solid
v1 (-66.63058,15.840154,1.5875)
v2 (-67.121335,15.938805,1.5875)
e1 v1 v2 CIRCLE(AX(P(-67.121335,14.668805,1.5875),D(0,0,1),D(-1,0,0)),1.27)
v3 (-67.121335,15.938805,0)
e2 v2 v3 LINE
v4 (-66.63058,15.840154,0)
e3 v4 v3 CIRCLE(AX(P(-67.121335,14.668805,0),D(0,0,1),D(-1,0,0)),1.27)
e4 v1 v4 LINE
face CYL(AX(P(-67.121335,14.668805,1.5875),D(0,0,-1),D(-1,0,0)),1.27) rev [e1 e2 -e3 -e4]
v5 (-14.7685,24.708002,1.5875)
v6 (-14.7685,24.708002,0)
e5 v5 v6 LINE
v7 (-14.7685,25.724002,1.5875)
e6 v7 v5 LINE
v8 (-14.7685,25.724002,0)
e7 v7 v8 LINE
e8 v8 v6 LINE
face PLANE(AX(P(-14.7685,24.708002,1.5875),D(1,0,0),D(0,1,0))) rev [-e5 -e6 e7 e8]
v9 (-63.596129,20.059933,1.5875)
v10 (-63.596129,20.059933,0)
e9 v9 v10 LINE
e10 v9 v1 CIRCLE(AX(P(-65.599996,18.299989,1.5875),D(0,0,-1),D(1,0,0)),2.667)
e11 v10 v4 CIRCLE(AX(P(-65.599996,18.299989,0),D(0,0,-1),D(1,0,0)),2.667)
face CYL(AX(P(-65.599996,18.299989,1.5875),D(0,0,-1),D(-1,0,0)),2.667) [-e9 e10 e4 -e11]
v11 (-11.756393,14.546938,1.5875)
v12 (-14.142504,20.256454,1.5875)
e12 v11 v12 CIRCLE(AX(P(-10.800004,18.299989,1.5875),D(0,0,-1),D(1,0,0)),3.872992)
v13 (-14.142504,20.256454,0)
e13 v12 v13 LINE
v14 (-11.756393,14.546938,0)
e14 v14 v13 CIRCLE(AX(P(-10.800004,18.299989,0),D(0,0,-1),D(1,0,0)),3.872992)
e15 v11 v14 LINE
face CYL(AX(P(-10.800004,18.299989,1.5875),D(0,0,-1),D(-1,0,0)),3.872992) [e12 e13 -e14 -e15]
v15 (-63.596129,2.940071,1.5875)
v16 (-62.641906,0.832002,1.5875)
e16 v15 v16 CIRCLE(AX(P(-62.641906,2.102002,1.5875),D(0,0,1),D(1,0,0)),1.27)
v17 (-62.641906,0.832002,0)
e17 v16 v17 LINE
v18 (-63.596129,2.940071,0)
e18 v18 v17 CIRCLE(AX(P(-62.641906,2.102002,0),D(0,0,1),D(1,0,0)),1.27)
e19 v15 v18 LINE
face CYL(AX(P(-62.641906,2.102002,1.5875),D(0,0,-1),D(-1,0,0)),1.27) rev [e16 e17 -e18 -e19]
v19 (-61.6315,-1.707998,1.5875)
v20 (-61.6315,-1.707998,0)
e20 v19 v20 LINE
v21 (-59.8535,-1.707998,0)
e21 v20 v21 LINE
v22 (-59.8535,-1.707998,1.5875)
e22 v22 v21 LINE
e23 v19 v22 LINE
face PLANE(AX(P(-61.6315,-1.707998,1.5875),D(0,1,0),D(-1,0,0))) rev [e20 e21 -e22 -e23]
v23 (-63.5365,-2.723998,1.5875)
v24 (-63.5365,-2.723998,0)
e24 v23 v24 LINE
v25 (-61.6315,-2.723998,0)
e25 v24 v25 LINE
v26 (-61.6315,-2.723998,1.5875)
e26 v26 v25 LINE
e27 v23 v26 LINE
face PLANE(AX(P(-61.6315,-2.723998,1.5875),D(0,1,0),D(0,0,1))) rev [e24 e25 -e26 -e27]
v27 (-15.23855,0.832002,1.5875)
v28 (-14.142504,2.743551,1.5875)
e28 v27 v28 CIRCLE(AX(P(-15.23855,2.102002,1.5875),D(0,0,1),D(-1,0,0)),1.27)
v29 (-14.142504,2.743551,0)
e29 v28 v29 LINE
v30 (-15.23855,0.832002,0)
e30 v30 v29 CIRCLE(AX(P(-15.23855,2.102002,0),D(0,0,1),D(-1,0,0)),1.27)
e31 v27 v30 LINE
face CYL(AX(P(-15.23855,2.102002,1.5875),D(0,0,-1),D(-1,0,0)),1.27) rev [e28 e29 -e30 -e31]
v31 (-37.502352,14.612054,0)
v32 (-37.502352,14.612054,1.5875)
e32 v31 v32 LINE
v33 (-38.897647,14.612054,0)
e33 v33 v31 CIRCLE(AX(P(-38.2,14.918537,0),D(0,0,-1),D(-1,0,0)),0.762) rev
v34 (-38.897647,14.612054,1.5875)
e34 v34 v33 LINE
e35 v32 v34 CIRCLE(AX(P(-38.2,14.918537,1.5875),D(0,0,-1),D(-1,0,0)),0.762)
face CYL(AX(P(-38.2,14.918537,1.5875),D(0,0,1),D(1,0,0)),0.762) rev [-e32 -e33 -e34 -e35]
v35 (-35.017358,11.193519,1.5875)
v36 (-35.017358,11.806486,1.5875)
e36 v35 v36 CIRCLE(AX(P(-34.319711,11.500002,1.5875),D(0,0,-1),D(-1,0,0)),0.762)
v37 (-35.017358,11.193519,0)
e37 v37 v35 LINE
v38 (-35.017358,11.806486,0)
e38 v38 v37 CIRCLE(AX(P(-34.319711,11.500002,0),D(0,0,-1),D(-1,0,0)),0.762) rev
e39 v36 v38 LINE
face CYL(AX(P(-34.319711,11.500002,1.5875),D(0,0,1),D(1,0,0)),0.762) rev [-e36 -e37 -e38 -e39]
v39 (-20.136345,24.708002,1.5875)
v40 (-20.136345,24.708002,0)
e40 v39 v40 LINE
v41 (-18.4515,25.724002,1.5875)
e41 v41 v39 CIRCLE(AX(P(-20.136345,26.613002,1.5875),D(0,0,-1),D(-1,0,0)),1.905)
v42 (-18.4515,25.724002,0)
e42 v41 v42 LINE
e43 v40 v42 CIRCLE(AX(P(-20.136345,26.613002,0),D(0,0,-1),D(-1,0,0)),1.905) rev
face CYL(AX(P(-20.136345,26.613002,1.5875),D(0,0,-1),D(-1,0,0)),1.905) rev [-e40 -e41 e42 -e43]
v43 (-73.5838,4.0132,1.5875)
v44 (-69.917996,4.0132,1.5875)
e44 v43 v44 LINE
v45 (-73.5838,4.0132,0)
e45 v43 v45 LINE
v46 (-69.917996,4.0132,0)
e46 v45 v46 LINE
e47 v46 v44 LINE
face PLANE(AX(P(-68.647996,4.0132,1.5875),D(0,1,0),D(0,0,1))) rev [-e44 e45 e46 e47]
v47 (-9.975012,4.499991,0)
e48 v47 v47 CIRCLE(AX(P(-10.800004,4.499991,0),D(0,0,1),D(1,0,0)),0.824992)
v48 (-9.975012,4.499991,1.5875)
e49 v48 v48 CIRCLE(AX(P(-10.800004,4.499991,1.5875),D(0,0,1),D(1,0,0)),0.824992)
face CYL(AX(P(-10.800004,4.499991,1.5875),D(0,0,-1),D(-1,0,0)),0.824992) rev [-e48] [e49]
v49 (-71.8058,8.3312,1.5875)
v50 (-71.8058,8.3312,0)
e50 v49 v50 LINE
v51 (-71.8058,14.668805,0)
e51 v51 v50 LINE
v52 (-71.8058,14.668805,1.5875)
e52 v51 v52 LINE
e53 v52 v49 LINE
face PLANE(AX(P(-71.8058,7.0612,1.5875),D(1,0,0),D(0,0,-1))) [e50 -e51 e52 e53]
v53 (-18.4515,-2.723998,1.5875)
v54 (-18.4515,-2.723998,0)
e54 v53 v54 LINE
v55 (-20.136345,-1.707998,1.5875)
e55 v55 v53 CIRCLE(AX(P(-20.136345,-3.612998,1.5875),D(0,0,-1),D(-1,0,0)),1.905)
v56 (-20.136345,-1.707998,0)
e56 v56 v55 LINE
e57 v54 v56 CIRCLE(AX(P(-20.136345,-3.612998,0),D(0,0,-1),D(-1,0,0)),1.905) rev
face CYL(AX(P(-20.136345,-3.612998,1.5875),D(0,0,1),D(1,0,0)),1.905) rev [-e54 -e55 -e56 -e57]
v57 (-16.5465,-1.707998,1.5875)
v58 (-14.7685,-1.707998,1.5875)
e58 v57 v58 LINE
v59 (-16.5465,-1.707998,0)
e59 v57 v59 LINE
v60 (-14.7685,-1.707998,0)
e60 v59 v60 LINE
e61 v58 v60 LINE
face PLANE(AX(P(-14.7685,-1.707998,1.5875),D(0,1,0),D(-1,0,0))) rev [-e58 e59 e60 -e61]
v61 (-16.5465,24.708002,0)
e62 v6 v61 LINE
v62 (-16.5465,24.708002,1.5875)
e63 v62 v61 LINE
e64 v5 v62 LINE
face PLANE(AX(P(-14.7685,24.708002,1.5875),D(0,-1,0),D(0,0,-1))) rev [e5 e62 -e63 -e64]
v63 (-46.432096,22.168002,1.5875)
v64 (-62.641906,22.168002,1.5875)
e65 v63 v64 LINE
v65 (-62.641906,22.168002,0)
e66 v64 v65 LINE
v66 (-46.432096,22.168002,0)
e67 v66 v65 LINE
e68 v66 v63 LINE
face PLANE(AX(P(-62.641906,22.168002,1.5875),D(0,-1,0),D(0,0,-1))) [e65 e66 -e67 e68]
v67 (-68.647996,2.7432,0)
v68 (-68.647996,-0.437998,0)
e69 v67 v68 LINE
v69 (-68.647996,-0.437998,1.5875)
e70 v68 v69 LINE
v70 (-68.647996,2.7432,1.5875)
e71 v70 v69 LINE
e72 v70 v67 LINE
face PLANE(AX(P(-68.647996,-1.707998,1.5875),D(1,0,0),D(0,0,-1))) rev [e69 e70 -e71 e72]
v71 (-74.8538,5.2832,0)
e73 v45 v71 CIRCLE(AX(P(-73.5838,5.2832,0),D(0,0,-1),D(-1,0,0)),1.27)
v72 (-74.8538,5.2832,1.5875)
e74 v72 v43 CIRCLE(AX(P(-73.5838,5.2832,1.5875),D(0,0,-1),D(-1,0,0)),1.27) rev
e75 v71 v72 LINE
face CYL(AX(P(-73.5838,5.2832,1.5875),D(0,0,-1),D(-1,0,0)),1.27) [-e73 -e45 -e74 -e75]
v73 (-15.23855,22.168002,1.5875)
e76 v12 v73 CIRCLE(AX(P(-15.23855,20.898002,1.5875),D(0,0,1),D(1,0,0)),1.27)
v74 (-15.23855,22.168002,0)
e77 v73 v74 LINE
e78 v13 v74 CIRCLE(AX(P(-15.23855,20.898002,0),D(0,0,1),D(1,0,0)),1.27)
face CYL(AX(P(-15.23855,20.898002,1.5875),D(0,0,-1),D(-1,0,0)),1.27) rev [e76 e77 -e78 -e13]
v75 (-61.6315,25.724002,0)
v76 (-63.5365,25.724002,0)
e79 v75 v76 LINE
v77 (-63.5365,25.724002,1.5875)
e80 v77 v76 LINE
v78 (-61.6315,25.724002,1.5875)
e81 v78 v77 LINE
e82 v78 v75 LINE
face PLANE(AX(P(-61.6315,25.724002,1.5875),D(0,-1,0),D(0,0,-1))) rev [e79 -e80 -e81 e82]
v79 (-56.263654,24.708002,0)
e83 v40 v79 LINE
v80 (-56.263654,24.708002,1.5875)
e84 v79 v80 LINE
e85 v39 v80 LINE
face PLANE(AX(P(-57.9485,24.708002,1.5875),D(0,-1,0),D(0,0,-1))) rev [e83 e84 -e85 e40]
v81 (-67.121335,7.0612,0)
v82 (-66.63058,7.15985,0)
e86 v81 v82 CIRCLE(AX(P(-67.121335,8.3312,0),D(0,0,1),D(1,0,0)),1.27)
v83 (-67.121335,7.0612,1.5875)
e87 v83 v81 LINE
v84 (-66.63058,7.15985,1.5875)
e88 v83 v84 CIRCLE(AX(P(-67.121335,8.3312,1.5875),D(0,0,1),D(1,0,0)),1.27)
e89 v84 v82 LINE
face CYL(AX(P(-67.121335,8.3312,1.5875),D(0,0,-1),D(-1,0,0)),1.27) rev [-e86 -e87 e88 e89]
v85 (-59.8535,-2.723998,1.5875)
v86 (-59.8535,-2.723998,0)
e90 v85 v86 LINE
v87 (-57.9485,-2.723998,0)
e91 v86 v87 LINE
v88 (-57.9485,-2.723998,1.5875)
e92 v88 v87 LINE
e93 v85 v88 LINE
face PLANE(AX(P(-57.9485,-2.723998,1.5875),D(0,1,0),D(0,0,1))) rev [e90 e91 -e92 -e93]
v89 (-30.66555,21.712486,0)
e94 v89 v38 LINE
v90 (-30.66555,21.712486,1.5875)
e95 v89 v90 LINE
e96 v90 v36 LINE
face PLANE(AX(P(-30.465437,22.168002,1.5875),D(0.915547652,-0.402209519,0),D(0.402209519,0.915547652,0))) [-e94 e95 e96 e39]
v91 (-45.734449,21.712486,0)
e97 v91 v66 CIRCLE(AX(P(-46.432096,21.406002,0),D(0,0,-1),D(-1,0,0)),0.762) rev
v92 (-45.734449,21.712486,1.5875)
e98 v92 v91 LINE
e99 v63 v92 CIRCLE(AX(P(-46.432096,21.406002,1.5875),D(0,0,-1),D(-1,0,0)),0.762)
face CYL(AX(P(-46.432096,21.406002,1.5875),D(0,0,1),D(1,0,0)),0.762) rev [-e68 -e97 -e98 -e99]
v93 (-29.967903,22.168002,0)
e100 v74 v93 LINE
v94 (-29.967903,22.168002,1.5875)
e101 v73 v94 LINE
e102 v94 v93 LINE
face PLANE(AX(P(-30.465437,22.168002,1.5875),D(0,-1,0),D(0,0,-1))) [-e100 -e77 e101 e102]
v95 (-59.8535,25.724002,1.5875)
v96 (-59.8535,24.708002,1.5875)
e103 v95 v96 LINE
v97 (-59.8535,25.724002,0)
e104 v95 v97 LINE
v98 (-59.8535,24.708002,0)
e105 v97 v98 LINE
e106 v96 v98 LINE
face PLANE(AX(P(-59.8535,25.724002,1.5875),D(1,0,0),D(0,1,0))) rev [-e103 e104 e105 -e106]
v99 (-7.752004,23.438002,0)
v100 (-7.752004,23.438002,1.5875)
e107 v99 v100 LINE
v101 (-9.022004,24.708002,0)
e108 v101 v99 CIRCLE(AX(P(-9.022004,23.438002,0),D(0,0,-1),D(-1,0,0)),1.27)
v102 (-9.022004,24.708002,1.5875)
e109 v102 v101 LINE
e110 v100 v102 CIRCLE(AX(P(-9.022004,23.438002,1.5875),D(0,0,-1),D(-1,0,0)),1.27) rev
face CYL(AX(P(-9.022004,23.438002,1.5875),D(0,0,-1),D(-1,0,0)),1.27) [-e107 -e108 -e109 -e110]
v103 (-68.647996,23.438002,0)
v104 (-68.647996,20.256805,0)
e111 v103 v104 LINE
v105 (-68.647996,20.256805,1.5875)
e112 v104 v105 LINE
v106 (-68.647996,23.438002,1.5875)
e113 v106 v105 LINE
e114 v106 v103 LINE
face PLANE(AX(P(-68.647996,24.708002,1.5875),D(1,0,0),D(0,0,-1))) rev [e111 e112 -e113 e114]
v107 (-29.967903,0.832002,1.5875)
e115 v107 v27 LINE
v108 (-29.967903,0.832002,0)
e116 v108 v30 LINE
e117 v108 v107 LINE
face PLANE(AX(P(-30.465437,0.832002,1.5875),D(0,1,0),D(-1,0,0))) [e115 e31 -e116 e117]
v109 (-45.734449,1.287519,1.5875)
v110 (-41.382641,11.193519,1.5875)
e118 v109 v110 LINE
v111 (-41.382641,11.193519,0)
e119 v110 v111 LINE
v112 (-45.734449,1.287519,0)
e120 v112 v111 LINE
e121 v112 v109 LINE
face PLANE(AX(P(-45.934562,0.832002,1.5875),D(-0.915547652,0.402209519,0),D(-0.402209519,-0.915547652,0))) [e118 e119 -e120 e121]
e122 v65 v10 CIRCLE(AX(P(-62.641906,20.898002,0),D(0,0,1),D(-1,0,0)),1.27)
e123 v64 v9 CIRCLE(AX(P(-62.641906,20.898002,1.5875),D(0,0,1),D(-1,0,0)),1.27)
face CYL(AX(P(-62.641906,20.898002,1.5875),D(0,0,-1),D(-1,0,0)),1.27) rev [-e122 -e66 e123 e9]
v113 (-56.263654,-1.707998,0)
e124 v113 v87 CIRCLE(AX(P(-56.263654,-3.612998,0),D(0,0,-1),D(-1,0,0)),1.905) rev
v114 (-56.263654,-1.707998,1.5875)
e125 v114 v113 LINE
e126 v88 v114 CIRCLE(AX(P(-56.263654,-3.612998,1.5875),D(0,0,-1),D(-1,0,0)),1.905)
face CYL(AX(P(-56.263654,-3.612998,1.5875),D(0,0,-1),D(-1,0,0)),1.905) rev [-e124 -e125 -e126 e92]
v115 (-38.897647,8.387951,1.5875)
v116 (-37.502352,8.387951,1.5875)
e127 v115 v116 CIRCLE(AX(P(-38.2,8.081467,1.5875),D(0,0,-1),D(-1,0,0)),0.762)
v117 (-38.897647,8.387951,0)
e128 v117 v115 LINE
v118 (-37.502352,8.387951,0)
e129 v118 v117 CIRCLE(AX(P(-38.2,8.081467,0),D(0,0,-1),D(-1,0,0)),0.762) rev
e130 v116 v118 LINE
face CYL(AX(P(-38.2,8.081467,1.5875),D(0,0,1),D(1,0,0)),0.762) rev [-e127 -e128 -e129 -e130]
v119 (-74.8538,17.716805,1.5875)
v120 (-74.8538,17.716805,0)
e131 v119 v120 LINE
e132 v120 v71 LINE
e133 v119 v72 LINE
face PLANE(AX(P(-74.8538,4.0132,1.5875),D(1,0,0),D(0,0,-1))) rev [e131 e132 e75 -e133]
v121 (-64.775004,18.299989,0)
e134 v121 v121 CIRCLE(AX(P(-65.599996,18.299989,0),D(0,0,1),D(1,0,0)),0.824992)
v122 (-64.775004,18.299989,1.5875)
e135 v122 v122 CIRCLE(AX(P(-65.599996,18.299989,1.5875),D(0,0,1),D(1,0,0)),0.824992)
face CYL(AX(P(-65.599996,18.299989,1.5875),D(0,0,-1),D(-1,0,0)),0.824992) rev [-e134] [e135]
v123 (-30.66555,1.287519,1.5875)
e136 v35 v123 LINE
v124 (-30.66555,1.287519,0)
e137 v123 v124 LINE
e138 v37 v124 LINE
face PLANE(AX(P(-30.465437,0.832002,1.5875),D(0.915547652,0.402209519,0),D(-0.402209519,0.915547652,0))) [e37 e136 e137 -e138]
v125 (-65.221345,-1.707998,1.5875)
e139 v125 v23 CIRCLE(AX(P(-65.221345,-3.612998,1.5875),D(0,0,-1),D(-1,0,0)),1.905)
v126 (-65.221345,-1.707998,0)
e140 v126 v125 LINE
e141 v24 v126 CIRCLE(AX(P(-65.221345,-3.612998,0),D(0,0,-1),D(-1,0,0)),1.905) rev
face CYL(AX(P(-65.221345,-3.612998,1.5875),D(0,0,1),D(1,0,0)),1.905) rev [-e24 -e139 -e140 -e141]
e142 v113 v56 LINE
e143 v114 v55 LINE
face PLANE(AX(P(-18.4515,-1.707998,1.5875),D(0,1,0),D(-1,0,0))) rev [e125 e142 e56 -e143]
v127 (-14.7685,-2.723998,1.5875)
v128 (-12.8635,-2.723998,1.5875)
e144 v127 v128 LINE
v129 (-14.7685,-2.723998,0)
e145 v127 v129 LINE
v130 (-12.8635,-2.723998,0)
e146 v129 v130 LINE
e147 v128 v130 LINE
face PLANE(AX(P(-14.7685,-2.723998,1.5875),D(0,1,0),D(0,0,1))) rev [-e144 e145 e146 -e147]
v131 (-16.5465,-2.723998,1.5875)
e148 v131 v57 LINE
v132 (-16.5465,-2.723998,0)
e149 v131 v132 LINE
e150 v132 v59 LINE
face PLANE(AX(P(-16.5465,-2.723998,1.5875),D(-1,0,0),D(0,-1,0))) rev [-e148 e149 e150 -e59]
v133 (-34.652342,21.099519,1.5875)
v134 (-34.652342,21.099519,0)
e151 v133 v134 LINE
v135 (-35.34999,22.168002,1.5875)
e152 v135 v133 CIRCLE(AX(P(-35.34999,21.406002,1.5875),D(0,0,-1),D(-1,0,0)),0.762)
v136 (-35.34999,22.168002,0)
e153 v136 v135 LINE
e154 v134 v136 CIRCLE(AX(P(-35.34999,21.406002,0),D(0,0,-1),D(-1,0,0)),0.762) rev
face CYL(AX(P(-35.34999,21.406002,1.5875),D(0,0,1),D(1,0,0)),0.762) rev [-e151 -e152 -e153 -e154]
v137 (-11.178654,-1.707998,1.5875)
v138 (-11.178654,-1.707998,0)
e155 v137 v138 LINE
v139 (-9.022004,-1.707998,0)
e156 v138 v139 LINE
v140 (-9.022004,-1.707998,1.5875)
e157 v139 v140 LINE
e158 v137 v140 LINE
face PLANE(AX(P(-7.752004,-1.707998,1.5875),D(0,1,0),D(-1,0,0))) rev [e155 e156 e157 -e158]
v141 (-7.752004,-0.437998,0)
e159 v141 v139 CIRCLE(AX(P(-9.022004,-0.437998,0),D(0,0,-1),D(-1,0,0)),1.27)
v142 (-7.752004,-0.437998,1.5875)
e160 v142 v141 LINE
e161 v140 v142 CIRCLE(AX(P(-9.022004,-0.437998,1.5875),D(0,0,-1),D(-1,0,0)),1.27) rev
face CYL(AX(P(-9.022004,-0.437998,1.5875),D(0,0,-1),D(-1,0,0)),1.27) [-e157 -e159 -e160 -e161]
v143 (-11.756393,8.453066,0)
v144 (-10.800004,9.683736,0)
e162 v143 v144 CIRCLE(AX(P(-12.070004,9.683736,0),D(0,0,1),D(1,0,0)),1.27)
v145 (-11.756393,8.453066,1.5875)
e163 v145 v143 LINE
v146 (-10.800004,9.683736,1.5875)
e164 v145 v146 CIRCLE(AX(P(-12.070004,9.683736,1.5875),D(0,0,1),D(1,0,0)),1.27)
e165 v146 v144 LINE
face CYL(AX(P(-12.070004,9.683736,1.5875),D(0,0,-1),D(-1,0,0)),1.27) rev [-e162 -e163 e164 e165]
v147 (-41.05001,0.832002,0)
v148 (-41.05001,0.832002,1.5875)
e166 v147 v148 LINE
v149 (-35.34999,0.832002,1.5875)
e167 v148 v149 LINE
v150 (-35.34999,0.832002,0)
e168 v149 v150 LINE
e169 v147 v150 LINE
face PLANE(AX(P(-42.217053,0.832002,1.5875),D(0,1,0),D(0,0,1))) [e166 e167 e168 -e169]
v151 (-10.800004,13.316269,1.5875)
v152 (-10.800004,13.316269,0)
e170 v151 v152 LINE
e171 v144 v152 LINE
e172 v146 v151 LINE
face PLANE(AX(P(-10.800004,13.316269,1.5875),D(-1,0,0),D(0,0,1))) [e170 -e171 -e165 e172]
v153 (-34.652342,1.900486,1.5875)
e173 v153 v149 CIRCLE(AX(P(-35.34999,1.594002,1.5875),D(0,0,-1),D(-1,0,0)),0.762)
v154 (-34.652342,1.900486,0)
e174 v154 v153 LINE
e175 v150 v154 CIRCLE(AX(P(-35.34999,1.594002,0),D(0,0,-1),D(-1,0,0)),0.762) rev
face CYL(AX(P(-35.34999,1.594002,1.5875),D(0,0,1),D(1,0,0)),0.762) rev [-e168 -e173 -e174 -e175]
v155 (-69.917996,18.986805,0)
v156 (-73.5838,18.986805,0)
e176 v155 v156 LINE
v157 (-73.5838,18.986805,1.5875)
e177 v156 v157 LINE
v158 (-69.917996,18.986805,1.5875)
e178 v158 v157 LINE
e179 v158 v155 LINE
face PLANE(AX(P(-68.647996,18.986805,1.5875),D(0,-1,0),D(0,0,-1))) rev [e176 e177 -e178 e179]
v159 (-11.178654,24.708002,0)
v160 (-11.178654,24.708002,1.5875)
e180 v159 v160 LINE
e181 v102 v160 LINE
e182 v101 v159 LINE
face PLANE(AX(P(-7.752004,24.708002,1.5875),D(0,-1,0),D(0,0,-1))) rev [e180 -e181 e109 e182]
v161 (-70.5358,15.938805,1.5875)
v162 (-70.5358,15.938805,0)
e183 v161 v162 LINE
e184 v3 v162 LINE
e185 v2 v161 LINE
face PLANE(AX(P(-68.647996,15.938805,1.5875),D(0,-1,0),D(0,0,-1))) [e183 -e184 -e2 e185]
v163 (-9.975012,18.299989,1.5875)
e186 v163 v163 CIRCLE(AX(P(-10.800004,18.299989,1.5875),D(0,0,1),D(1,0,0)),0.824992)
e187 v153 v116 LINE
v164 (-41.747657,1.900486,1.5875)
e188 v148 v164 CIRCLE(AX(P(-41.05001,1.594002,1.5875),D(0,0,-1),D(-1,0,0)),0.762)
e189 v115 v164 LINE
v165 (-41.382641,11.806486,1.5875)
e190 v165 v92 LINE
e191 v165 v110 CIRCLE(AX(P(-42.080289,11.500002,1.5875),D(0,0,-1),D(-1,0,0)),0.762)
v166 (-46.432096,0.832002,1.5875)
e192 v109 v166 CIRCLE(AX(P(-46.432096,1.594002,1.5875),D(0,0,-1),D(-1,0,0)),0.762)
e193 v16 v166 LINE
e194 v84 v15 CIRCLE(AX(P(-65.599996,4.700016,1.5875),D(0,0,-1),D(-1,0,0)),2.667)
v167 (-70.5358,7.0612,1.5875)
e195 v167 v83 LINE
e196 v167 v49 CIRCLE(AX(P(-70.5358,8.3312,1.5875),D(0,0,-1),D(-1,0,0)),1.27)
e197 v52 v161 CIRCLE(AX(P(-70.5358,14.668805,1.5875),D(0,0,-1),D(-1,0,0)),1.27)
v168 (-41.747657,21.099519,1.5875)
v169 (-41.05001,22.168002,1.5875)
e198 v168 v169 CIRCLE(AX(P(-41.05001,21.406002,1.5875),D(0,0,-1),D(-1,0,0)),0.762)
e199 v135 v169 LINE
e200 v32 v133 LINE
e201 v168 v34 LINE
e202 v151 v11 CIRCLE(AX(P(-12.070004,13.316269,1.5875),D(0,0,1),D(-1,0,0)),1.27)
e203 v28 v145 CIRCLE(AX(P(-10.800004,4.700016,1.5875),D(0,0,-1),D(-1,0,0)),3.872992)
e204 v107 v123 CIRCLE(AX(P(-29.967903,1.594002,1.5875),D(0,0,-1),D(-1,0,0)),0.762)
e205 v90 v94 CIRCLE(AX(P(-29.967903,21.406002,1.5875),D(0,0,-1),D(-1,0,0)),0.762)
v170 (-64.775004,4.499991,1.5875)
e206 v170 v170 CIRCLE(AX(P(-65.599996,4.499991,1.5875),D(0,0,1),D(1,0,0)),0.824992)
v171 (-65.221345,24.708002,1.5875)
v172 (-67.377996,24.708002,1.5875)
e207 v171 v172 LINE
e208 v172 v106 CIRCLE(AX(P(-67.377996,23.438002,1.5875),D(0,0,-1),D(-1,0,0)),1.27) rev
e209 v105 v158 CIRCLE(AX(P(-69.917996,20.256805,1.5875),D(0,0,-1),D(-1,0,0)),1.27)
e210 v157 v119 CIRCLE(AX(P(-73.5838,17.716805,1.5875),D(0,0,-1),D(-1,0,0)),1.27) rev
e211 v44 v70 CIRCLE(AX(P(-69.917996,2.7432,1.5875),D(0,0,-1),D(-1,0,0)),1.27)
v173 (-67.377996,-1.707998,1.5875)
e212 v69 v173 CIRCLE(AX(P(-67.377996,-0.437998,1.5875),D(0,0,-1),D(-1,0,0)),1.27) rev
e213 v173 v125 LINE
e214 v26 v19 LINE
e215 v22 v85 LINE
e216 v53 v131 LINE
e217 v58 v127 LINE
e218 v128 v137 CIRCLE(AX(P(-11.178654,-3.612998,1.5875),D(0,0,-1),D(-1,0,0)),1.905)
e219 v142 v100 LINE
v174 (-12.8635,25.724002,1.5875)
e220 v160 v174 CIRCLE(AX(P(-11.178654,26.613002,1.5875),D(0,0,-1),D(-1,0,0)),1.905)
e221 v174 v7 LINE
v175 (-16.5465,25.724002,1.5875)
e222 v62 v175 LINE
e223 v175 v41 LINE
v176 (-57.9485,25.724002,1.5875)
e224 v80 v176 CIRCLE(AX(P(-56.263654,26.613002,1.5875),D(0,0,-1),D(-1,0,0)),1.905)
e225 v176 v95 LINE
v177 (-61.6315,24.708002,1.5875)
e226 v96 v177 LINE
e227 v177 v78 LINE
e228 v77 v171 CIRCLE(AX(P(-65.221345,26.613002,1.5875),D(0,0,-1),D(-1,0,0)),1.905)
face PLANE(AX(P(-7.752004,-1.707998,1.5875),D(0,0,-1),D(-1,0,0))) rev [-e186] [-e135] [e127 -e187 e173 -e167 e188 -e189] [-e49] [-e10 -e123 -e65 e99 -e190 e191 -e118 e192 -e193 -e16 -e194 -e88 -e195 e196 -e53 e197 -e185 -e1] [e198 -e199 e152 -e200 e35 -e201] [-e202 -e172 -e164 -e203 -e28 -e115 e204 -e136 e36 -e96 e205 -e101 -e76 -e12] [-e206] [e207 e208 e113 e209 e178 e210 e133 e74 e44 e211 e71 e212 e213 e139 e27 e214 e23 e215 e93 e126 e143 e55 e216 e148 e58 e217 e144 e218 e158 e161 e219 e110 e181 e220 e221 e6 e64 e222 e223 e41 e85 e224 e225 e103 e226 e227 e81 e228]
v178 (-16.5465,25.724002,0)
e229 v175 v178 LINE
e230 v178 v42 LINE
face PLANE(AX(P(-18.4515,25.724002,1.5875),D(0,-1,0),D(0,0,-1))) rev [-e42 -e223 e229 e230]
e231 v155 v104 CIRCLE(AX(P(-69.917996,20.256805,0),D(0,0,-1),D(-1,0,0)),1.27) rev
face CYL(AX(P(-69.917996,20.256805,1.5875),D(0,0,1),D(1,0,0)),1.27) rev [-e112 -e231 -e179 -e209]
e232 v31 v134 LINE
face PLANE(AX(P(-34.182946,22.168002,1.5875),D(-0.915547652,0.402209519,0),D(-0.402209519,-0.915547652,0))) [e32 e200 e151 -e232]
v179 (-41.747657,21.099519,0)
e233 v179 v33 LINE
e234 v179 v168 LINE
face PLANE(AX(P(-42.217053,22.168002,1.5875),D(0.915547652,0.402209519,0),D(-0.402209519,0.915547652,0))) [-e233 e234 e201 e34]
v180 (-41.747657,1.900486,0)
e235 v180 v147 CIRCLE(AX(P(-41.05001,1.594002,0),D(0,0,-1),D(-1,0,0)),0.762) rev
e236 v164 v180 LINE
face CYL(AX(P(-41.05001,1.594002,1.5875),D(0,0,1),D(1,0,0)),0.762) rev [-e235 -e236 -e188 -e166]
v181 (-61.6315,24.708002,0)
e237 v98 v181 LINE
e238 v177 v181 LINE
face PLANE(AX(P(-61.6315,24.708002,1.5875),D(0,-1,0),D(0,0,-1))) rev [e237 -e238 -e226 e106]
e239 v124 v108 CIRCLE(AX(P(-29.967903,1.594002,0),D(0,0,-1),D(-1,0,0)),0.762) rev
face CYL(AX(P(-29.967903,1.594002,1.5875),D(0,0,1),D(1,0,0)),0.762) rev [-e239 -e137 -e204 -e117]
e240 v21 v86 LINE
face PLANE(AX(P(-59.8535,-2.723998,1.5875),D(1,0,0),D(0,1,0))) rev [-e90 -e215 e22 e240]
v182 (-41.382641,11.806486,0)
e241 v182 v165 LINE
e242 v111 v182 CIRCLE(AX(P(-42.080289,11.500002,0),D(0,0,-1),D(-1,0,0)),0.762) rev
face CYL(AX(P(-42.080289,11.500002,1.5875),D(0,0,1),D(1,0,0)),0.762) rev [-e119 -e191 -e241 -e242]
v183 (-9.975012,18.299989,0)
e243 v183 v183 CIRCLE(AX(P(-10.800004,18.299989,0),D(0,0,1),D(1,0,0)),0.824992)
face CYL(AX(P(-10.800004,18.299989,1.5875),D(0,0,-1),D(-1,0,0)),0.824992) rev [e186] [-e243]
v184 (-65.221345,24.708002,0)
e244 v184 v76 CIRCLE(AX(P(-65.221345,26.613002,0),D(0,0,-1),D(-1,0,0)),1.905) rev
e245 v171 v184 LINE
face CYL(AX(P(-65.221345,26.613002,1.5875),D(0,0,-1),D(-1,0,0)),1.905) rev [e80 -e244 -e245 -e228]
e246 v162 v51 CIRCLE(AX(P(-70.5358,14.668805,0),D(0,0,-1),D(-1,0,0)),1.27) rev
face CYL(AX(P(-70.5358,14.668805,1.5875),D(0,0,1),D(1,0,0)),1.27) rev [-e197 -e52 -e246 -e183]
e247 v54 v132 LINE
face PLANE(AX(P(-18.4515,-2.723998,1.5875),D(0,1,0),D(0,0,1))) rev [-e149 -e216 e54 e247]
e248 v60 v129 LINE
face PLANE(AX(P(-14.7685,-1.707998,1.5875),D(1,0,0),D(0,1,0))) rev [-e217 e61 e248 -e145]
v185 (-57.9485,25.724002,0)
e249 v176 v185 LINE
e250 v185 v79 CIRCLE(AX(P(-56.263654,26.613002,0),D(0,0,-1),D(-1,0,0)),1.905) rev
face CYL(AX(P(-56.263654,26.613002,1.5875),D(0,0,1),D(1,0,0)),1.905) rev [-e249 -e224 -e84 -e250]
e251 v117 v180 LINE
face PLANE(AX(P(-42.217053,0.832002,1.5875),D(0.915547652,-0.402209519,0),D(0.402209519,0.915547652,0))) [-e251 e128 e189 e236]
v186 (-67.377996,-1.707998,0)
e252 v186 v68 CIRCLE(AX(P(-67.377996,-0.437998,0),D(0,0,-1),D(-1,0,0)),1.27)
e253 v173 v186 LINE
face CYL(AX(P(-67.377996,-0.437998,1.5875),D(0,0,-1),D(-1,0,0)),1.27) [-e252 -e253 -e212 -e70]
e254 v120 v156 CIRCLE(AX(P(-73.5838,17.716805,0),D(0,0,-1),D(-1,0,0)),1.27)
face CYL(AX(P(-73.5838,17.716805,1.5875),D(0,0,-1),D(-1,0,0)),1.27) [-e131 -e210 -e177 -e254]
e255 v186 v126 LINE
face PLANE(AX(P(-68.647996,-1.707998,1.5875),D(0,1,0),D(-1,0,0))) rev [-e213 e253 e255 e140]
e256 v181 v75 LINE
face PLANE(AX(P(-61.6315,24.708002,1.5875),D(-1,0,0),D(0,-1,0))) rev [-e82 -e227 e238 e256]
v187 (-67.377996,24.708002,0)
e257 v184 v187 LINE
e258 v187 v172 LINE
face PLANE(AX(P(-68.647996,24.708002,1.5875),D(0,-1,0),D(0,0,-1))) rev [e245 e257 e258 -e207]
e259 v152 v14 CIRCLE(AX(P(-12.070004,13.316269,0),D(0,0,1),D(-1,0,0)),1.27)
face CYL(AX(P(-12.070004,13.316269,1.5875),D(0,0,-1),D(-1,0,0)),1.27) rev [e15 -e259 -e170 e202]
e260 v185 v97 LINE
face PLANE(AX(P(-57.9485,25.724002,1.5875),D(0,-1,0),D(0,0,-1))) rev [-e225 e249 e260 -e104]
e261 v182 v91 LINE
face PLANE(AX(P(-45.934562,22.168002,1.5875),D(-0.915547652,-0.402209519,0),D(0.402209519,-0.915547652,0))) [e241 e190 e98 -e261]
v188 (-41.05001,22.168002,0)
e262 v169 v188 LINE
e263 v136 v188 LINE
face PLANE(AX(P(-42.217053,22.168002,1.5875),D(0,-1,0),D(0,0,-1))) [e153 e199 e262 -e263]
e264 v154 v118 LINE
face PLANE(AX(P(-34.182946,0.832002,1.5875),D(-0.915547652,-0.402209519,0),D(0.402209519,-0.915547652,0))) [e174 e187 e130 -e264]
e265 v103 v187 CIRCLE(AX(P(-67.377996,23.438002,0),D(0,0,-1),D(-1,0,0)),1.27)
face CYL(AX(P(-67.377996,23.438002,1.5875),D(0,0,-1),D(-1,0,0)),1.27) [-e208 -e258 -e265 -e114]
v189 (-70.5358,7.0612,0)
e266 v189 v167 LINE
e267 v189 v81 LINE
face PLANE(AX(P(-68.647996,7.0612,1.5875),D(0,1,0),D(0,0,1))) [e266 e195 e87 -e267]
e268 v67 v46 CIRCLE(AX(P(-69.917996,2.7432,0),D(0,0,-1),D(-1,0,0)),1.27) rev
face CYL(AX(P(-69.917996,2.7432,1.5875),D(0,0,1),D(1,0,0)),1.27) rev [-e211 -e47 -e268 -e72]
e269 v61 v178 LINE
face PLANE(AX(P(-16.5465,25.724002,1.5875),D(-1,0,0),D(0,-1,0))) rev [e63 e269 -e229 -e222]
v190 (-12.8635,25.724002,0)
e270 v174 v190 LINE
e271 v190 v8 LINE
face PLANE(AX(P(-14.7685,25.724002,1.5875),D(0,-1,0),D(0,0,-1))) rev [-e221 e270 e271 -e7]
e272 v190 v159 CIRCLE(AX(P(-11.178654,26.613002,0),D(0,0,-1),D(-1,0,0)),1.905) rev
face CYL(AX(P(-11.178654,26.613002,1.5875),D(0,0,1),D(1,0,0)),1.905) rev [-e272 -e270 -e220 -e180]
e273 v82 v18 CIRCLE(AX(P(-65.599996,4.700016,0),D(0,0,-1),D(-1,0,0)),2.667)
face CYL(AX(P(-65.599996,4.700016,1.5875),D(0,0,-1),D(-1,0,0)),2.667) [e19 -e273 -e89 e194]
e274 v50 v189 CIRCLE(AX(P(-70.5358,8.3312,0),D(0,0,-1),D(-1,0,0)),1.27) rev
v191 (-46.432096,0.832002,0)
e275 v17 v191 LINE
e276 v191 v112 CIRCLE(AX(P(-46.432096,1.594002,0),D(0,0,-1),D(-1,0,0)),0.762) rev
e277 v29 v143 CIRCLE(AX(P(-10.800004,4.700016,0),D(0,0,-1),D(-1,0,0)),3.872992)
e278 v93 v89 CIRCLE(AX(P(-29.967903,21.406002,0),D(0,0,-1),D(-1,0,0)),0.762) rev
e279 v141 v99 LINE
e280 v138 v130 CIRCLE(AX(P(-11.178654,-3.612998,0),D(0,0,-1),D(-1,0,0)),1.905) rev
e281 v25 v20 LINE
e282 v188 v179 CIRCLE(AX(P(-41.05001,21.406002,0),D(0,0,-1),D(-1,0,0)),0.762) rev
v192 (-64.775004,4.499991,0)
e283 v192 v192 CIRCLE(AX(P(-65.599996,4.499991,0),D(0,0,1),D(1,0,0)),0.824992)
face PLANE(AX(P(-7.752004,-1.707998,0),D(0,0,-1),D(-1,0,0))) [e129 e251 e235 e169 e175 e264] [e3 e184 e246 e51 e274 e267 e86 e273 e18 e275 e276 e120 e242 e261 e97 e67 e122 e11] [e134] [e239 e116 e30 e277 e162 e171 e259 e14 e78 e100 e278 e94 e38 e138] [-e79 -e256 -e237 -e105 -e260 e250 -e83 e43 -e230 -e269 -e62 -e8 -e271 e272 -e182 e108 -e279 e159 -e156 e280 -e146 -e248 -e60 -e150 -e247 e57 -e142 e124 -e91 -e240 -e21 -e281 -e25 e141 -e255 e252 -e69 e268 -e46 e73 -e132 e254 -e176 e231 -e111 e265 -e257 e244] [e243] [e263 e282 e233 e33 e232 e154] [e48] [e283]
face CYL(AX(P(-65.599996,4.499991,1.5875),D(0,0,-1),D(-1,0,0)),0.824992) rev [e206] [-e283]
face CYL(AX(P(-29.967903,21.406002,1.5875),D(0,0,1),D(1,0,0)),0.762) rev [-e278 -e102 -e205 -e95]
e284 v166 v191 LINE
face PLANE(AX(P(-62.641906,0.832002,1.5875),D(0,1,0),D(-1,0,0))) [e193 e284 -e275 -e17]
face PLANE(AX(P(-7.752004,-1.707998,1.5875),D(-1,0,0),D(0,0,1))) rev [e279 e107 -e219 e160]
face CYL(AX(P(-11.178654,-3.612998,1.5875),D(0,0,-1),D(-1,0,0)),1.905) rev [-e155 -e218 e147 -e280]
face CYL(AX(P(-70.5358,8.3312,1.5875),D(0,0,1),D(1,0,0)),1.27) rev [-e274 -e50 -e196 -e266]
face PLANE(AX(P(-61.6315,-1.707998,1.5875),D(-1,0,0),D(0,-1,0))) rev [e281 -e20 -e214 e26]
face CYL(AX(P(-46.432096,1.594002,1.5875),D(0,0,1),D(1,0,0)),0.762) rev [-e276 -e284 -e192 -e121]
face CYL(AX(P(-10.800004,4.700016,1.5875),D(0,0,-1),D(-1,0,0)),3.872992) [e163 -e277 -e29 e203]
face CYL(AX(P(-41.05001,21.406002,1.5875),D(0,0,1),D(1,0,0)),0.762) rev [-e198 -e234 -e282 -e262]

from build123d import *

# Parameters (mm, degrees)
SKETCH1_R           = 0.824992
BOSS_EXTRUDE1_DEPTH = 1.5875
FILLET4_R           = 0.762
FILLET5_R           = 1.27
FILLET6_R           = 1.905


with BuildPart() as part:
    # Sketch1 → Boss-Extrude1 (new body)
    with BuildSketch(Plane.XY):
        Polygon((-7.7520038, 24.7080024), (-12.8634998, 24.7080024), (-12.8634998, 25.7240024), (-14.7684998, 25.7240024), (-14.7684998, 24.7080024), (-16.5464998, 24.7080024), (-16.5464998, 25.7240024), (-18.4514998, 25.7240024), (-18.4514998, 24.7080024), (-38.1999998, 24.7080024), (-57.9484998, 24.7080024), (-57.9484998, 25.7240024), (-59.8534998, 25.7240024), (-59.8534998, 24.7080024), (-61.6314998, 24.7080024), (-61.6314998, 25.7240024), (-63.5364998, 25.7240024), (-63.5364998, 24.7080024), (-68.6479958, 24.7080024), (-68.6479958, 18.9868048), (-74.8538, 18.9868048), (-74.8538, 11.5000024), (-74.8538, 4.0132), (-68.6479958, 4.0132), (-68.6479958, -1.7079976), (-63.5364998, -1.7079976), (-63.5364998, -2.7239976), (-61.6314998, -2.7239976), (-61.6314998, -1.7079976), (-59.8534998, -1.7079976), (-59.8534998, -2.7239976), (-57.9484998, -2.7239976), (-57.9484998, -1.7079976), (-38.1999998, -1.7079976), (-18.4514998, -1.7079976), (-18.4514998, -2.7239976), (-16.5464998, -2.7239976), (-16.5464998, -1.7079976), (-14.7684998, -1.7079976), (-14.7684998, -2.7239976), (-12.8634998, -2.7239976), (-12.8634998, -1.7079976), (-7.7520038, -1.7079976), (-7.7520038, 11.5000024), align=None)
        with Locations((-10.8000038, 18.2999888)):
            Circle(SKETCH1_R, mode=Mode.SUBTRACT)
        with Locations((-10.8000038, 4.499991)):
            Circle(SKETCH1_R, mode=Mode.SUBTRACT)
        with Locations((-65.5999958, 18.2999888)):
            Circle(SKETCH1_R, mode=Mode.SUBTRACT)
        with Locations((-65.5999958, 4.499991)):
            Circle(SKETCH1_R, mode=Mode.SUBTRACT)
        with BuildLine():
            Line((-68.6479958, 15.9388048), (-71.8058, 15.9388048))
            Line((-71.8058, 15.9388048), (-71.8058, 11.5000024))
            Line((-71.8058, 11.5000024), (-71.8058, 7.0612))
            Line((-71.8058, 7.0612), (-68.6479958, 7.0612))
            Line((-68.6479958, 7.0612), (-67.121334605, 7.0612))
            ThreePointArc((-67.121334605, 7.0612), (-66.871048858, 7.086106813), (-66.630580151, 7.159850323))
            ThreePointArc((-66.630580151, 7.159850323), (-63.434712075, 6.257075855), (-63.596128623, 2.940071303))
            ThreePointArc((-63.596128623, 2.940071303), (-63.798895247, 1.578288502), (-62.641906157, 0.8320024))
            Line((-62.641906157, 0.8320024), (-45.934562137, 0.8320024))
            Line((-45.934562137, 0.8320024), (-41.2479998, 11.5000024))
            Line((-41.2479998, 11.5000024), (-45.934562137, 22.1680024))
            Line((-45.934562137, 22.1680024), (-62.641906157, 22.1680024))
            ThreePointArc((-62.641906157, 22.1680024), (-63.798895247, 21.421716298), (-63.596128623, 20.059933497))
            ThreePointArc((-63.596128623, 20.059933497), (-63.434712075, 16.742928945), (-66.630580151, 15.840154477))
            ThreePointArc((-66.630580151, 15.840154477), (-66.871048858, 15.913897987), (-67.121334605, 15.9388048))
            Line((-67.121334605, 15.9388048), (-68.6479958, 15.9388048))
        make_face(mode=Mode.SUBTRACT)
        with BuildLine():
            Line((-10.8000038, 13.316268632), (-10.8000038, 9.683736168))
            ThreePointArc((-10.8000038, 9.683736168), (-11.067211137, 8.904437204), (-11.756392579, 8.453066431))
            ThreePointArc((-11.756392579, 8.453066431), (-14.373483224, 6.193438859), (-14.142504388, 2.743550602))
            ThreePointArc((-14.142504388, 2.743550602), (-14.136809019, 1.470284986), (-15.238549964, 0.8320024))
            Line((-15.238549964, 0.8320024), (-30.465437463, 0.8320024))
            Line((-30.465437463, 0.8320024), (-35.1519998, 11.5000024))
            Line((-35.1519998, 11.5000024), (-30.465437463, 22.1680024))
            Line((-30.465437463, 22.1680024), (-15.238549964, 22.1680024))
            ThreePointArc((-15.238549964, 22.1680024), (-14.136809019, 21.529719814), (-14.142504388, 20.256454198))
            ThreePointArc((-14.142504388, 20.256454198), (-14.373483224, 16.806565941), (-11.756392579, 14.546938369))
            ThreePointArc((-11.756392579, 14.546938369), (-11.067211137, 14.095567596), (-10.8000038, 13.316268632))
        make_face(mode=Mode.SUBTRACT)
        Polygon((-42.217053232, 22.1680024), (-38.1999998, 13.0240024), (-34.182946368, 22.1680024), align=None, mode=Mode.SUBTRACT)
        Polygon((-34.182946368, 0.8320024), (-38.1999998, 9.9760024), (-42.217053232, 0.8320024), align=None, mode=Mode.SUBTRACT)
    extrude(amount=BOSS_EXTRUDE1_DEPTH)

    # Fillet4
    fillet4_edges = [part.edges().sort_by_distance(p)[0] for p in [
        (-34.182946368, 22.1680024, 0.79375),
        (-42.217053232, 22.1680024, 0.79375),
        (-38.1999998, 13.0240024, 0.79375),
        (-45.934562137, 0.8320024, 0.79375),
        (-41.2479998, 11.5000024, 0.79375),
        (-45.934562137, 22.1680024, 0.79375),
        (-30.465437463, 22.1680024, 0.79375),
        (-35.1519998, 11.5000024, 0.79375),
        (-30.465437463, 0.8320024, 0.79375),
        (-42.217053232, 0.8320024, 0.79375),
        (-34.182946368, 0.8320024, 0.79375),
        (-38.1999998, 9.9760024, 0.79375),
    ]]
    fillet(fillet4_edges, radius=FILLET4_R)

    # Fillet5
    fillet5_edges = [part.edges().sort_by_distance(p)[0] for p in [
        (-71.8058, 15.9388048, 0.79375),
        (-71.8058, 7.0612, 0.79375),
        (-7.7520038, -1.7079976, 0.79375),
        (-68.6479958, -1.7079976, 0.79375),
        (-68.6479958, 4.0132, 0.79375),
        (-74.8538, 4.0132, 0.79375),
        (-74.8538, 18.9868048, 0.79375),
        (-68.6479958, 18.9868048, 0.79375),
        (-68.6479958, 24.7080024, 0.79375),
        (-7.7520038, 24.7080024, 0.79375),
    ]]
    fillet(fillet5_edges, radius=FILLET5_R)

    # Fillet6
    # the kernel refuses this fillet: 1.905 mm, written as the material it adds along each edge
    with BuildSketch(Plane(origin=(-18.4514998, -1.7079976, 0), x_dir=(0, -1, 0), z_dir=(0, 0, 1)), Plane(origin=(-63.5364998, -1.7079976, 0), x_dir=(0, -1, 0), z_dir=(0, 0, 1))) as fillet6_piece_1:
        with BuildLine():
            CenterArc((1.905, -1.684845394), FILLET6_R, 117.818139285, 62.181860715)
            Line((0, -1.684845394), (-0.0381, -1.684845394))
            Line((-0.0381, -1.684845394), (-0.0381, 0))
            Line((-0.0381, 0), (0, 0.0381))
            ThreePointArc((0, 0.0381), (0.508, 0.0381), (0.99822, 0.033696908))
            Line((0.99822, 0.033696908), (1.016, 0))
        make_face()
    extrude(amount=1.5875)
    with BuildSketch(Plane(origin=(-12.8634998, -1.7079976, 0), x_dir=(1, 0, 0), z_dir=(0, 0, 1)), Plane(origin=(-57.9484998, -1.7079976, 0), x_dir=(1, 0, 0), z_dir=(0, 0, 1))) as fillet6_piece_2:
        with BuildLine():
            CenterArc((1.684845394, -1.905), FILLET6_R, 90, 62.181860715)
            Line((0, -1.016), (-0.033696908, -0.99822))
            ThreePointArc((-0.033696908, -0.99822), (-0.0381, -0.508), (-0.0381, 0))
            Line((-0.0381, 0), (0, 0.0381))
            Line((0, 0.0381), (1.684845394, 0.0381))
            Line((1.684845394, 0.0381), (1.684845394, 0))
        make_face()
    extrude(amount=1.5875)
    with BuildSketch(Plane(origin=(-18.4514998, 24.7080024, 0), x_dir=(0, 1, 0), z_dir=(0, 0, 1)), Plane(origin=(-63.5364998, 24.7080024, 0), x_dir=(0, 1, 0), z_dir=(0, 0, 1))) as fillet6_piece_3:
        with BuildLine():
            CenterArc((1.905, 1.684845394), FILLET6_R, 180, 62.181860715)
            Line((0, 1.684845394), (-0.0381, 1.684845394))
            Line((-0.0381, 1.684845394), (-0.0381, 0))
            Line((-0.0381, 0), (0, -0.0381))
            ThreePointArc((0, -0.0381), (0.508, -0.0381), (0.99822, -0.033696908))
            Line((0.99822, -0.033696908), (1.016, 0))
        make_face()
    extrude(amount=1.5875)
    with BuildSketch(Plane(origin=(-12.8634998, 24.7080024, 0), x_dir=(1, 0, 0), z_dir=(0, 0, 1)), Plane(origin=(-57.9484998, 24.7080024, 0), x_dir=(1, 0, 0), z_dir=(0, 0, 1))) as fillet6_piece_4:
        with BuildLine():
            CenterArc((1.684845394, 1.905), FILLET6_R, 207.818139285, 62.181860715)
            Line((0, 1.016), (-0.033696908, 0.99822))
            ThreePointArc((-0.033696908, 0.99822), (-0.0381, 0.508), (-0.0381, 0))
            Line((-0.0381, 0), (0, -0.0381))
            Line((0, -0.0381), (1.684845394, -0.0381))
            Line((1.684845394, -0.0381), (1.684845394, 0))
        make_face()
    extrude(amount=1.5875)


solid = part.part
